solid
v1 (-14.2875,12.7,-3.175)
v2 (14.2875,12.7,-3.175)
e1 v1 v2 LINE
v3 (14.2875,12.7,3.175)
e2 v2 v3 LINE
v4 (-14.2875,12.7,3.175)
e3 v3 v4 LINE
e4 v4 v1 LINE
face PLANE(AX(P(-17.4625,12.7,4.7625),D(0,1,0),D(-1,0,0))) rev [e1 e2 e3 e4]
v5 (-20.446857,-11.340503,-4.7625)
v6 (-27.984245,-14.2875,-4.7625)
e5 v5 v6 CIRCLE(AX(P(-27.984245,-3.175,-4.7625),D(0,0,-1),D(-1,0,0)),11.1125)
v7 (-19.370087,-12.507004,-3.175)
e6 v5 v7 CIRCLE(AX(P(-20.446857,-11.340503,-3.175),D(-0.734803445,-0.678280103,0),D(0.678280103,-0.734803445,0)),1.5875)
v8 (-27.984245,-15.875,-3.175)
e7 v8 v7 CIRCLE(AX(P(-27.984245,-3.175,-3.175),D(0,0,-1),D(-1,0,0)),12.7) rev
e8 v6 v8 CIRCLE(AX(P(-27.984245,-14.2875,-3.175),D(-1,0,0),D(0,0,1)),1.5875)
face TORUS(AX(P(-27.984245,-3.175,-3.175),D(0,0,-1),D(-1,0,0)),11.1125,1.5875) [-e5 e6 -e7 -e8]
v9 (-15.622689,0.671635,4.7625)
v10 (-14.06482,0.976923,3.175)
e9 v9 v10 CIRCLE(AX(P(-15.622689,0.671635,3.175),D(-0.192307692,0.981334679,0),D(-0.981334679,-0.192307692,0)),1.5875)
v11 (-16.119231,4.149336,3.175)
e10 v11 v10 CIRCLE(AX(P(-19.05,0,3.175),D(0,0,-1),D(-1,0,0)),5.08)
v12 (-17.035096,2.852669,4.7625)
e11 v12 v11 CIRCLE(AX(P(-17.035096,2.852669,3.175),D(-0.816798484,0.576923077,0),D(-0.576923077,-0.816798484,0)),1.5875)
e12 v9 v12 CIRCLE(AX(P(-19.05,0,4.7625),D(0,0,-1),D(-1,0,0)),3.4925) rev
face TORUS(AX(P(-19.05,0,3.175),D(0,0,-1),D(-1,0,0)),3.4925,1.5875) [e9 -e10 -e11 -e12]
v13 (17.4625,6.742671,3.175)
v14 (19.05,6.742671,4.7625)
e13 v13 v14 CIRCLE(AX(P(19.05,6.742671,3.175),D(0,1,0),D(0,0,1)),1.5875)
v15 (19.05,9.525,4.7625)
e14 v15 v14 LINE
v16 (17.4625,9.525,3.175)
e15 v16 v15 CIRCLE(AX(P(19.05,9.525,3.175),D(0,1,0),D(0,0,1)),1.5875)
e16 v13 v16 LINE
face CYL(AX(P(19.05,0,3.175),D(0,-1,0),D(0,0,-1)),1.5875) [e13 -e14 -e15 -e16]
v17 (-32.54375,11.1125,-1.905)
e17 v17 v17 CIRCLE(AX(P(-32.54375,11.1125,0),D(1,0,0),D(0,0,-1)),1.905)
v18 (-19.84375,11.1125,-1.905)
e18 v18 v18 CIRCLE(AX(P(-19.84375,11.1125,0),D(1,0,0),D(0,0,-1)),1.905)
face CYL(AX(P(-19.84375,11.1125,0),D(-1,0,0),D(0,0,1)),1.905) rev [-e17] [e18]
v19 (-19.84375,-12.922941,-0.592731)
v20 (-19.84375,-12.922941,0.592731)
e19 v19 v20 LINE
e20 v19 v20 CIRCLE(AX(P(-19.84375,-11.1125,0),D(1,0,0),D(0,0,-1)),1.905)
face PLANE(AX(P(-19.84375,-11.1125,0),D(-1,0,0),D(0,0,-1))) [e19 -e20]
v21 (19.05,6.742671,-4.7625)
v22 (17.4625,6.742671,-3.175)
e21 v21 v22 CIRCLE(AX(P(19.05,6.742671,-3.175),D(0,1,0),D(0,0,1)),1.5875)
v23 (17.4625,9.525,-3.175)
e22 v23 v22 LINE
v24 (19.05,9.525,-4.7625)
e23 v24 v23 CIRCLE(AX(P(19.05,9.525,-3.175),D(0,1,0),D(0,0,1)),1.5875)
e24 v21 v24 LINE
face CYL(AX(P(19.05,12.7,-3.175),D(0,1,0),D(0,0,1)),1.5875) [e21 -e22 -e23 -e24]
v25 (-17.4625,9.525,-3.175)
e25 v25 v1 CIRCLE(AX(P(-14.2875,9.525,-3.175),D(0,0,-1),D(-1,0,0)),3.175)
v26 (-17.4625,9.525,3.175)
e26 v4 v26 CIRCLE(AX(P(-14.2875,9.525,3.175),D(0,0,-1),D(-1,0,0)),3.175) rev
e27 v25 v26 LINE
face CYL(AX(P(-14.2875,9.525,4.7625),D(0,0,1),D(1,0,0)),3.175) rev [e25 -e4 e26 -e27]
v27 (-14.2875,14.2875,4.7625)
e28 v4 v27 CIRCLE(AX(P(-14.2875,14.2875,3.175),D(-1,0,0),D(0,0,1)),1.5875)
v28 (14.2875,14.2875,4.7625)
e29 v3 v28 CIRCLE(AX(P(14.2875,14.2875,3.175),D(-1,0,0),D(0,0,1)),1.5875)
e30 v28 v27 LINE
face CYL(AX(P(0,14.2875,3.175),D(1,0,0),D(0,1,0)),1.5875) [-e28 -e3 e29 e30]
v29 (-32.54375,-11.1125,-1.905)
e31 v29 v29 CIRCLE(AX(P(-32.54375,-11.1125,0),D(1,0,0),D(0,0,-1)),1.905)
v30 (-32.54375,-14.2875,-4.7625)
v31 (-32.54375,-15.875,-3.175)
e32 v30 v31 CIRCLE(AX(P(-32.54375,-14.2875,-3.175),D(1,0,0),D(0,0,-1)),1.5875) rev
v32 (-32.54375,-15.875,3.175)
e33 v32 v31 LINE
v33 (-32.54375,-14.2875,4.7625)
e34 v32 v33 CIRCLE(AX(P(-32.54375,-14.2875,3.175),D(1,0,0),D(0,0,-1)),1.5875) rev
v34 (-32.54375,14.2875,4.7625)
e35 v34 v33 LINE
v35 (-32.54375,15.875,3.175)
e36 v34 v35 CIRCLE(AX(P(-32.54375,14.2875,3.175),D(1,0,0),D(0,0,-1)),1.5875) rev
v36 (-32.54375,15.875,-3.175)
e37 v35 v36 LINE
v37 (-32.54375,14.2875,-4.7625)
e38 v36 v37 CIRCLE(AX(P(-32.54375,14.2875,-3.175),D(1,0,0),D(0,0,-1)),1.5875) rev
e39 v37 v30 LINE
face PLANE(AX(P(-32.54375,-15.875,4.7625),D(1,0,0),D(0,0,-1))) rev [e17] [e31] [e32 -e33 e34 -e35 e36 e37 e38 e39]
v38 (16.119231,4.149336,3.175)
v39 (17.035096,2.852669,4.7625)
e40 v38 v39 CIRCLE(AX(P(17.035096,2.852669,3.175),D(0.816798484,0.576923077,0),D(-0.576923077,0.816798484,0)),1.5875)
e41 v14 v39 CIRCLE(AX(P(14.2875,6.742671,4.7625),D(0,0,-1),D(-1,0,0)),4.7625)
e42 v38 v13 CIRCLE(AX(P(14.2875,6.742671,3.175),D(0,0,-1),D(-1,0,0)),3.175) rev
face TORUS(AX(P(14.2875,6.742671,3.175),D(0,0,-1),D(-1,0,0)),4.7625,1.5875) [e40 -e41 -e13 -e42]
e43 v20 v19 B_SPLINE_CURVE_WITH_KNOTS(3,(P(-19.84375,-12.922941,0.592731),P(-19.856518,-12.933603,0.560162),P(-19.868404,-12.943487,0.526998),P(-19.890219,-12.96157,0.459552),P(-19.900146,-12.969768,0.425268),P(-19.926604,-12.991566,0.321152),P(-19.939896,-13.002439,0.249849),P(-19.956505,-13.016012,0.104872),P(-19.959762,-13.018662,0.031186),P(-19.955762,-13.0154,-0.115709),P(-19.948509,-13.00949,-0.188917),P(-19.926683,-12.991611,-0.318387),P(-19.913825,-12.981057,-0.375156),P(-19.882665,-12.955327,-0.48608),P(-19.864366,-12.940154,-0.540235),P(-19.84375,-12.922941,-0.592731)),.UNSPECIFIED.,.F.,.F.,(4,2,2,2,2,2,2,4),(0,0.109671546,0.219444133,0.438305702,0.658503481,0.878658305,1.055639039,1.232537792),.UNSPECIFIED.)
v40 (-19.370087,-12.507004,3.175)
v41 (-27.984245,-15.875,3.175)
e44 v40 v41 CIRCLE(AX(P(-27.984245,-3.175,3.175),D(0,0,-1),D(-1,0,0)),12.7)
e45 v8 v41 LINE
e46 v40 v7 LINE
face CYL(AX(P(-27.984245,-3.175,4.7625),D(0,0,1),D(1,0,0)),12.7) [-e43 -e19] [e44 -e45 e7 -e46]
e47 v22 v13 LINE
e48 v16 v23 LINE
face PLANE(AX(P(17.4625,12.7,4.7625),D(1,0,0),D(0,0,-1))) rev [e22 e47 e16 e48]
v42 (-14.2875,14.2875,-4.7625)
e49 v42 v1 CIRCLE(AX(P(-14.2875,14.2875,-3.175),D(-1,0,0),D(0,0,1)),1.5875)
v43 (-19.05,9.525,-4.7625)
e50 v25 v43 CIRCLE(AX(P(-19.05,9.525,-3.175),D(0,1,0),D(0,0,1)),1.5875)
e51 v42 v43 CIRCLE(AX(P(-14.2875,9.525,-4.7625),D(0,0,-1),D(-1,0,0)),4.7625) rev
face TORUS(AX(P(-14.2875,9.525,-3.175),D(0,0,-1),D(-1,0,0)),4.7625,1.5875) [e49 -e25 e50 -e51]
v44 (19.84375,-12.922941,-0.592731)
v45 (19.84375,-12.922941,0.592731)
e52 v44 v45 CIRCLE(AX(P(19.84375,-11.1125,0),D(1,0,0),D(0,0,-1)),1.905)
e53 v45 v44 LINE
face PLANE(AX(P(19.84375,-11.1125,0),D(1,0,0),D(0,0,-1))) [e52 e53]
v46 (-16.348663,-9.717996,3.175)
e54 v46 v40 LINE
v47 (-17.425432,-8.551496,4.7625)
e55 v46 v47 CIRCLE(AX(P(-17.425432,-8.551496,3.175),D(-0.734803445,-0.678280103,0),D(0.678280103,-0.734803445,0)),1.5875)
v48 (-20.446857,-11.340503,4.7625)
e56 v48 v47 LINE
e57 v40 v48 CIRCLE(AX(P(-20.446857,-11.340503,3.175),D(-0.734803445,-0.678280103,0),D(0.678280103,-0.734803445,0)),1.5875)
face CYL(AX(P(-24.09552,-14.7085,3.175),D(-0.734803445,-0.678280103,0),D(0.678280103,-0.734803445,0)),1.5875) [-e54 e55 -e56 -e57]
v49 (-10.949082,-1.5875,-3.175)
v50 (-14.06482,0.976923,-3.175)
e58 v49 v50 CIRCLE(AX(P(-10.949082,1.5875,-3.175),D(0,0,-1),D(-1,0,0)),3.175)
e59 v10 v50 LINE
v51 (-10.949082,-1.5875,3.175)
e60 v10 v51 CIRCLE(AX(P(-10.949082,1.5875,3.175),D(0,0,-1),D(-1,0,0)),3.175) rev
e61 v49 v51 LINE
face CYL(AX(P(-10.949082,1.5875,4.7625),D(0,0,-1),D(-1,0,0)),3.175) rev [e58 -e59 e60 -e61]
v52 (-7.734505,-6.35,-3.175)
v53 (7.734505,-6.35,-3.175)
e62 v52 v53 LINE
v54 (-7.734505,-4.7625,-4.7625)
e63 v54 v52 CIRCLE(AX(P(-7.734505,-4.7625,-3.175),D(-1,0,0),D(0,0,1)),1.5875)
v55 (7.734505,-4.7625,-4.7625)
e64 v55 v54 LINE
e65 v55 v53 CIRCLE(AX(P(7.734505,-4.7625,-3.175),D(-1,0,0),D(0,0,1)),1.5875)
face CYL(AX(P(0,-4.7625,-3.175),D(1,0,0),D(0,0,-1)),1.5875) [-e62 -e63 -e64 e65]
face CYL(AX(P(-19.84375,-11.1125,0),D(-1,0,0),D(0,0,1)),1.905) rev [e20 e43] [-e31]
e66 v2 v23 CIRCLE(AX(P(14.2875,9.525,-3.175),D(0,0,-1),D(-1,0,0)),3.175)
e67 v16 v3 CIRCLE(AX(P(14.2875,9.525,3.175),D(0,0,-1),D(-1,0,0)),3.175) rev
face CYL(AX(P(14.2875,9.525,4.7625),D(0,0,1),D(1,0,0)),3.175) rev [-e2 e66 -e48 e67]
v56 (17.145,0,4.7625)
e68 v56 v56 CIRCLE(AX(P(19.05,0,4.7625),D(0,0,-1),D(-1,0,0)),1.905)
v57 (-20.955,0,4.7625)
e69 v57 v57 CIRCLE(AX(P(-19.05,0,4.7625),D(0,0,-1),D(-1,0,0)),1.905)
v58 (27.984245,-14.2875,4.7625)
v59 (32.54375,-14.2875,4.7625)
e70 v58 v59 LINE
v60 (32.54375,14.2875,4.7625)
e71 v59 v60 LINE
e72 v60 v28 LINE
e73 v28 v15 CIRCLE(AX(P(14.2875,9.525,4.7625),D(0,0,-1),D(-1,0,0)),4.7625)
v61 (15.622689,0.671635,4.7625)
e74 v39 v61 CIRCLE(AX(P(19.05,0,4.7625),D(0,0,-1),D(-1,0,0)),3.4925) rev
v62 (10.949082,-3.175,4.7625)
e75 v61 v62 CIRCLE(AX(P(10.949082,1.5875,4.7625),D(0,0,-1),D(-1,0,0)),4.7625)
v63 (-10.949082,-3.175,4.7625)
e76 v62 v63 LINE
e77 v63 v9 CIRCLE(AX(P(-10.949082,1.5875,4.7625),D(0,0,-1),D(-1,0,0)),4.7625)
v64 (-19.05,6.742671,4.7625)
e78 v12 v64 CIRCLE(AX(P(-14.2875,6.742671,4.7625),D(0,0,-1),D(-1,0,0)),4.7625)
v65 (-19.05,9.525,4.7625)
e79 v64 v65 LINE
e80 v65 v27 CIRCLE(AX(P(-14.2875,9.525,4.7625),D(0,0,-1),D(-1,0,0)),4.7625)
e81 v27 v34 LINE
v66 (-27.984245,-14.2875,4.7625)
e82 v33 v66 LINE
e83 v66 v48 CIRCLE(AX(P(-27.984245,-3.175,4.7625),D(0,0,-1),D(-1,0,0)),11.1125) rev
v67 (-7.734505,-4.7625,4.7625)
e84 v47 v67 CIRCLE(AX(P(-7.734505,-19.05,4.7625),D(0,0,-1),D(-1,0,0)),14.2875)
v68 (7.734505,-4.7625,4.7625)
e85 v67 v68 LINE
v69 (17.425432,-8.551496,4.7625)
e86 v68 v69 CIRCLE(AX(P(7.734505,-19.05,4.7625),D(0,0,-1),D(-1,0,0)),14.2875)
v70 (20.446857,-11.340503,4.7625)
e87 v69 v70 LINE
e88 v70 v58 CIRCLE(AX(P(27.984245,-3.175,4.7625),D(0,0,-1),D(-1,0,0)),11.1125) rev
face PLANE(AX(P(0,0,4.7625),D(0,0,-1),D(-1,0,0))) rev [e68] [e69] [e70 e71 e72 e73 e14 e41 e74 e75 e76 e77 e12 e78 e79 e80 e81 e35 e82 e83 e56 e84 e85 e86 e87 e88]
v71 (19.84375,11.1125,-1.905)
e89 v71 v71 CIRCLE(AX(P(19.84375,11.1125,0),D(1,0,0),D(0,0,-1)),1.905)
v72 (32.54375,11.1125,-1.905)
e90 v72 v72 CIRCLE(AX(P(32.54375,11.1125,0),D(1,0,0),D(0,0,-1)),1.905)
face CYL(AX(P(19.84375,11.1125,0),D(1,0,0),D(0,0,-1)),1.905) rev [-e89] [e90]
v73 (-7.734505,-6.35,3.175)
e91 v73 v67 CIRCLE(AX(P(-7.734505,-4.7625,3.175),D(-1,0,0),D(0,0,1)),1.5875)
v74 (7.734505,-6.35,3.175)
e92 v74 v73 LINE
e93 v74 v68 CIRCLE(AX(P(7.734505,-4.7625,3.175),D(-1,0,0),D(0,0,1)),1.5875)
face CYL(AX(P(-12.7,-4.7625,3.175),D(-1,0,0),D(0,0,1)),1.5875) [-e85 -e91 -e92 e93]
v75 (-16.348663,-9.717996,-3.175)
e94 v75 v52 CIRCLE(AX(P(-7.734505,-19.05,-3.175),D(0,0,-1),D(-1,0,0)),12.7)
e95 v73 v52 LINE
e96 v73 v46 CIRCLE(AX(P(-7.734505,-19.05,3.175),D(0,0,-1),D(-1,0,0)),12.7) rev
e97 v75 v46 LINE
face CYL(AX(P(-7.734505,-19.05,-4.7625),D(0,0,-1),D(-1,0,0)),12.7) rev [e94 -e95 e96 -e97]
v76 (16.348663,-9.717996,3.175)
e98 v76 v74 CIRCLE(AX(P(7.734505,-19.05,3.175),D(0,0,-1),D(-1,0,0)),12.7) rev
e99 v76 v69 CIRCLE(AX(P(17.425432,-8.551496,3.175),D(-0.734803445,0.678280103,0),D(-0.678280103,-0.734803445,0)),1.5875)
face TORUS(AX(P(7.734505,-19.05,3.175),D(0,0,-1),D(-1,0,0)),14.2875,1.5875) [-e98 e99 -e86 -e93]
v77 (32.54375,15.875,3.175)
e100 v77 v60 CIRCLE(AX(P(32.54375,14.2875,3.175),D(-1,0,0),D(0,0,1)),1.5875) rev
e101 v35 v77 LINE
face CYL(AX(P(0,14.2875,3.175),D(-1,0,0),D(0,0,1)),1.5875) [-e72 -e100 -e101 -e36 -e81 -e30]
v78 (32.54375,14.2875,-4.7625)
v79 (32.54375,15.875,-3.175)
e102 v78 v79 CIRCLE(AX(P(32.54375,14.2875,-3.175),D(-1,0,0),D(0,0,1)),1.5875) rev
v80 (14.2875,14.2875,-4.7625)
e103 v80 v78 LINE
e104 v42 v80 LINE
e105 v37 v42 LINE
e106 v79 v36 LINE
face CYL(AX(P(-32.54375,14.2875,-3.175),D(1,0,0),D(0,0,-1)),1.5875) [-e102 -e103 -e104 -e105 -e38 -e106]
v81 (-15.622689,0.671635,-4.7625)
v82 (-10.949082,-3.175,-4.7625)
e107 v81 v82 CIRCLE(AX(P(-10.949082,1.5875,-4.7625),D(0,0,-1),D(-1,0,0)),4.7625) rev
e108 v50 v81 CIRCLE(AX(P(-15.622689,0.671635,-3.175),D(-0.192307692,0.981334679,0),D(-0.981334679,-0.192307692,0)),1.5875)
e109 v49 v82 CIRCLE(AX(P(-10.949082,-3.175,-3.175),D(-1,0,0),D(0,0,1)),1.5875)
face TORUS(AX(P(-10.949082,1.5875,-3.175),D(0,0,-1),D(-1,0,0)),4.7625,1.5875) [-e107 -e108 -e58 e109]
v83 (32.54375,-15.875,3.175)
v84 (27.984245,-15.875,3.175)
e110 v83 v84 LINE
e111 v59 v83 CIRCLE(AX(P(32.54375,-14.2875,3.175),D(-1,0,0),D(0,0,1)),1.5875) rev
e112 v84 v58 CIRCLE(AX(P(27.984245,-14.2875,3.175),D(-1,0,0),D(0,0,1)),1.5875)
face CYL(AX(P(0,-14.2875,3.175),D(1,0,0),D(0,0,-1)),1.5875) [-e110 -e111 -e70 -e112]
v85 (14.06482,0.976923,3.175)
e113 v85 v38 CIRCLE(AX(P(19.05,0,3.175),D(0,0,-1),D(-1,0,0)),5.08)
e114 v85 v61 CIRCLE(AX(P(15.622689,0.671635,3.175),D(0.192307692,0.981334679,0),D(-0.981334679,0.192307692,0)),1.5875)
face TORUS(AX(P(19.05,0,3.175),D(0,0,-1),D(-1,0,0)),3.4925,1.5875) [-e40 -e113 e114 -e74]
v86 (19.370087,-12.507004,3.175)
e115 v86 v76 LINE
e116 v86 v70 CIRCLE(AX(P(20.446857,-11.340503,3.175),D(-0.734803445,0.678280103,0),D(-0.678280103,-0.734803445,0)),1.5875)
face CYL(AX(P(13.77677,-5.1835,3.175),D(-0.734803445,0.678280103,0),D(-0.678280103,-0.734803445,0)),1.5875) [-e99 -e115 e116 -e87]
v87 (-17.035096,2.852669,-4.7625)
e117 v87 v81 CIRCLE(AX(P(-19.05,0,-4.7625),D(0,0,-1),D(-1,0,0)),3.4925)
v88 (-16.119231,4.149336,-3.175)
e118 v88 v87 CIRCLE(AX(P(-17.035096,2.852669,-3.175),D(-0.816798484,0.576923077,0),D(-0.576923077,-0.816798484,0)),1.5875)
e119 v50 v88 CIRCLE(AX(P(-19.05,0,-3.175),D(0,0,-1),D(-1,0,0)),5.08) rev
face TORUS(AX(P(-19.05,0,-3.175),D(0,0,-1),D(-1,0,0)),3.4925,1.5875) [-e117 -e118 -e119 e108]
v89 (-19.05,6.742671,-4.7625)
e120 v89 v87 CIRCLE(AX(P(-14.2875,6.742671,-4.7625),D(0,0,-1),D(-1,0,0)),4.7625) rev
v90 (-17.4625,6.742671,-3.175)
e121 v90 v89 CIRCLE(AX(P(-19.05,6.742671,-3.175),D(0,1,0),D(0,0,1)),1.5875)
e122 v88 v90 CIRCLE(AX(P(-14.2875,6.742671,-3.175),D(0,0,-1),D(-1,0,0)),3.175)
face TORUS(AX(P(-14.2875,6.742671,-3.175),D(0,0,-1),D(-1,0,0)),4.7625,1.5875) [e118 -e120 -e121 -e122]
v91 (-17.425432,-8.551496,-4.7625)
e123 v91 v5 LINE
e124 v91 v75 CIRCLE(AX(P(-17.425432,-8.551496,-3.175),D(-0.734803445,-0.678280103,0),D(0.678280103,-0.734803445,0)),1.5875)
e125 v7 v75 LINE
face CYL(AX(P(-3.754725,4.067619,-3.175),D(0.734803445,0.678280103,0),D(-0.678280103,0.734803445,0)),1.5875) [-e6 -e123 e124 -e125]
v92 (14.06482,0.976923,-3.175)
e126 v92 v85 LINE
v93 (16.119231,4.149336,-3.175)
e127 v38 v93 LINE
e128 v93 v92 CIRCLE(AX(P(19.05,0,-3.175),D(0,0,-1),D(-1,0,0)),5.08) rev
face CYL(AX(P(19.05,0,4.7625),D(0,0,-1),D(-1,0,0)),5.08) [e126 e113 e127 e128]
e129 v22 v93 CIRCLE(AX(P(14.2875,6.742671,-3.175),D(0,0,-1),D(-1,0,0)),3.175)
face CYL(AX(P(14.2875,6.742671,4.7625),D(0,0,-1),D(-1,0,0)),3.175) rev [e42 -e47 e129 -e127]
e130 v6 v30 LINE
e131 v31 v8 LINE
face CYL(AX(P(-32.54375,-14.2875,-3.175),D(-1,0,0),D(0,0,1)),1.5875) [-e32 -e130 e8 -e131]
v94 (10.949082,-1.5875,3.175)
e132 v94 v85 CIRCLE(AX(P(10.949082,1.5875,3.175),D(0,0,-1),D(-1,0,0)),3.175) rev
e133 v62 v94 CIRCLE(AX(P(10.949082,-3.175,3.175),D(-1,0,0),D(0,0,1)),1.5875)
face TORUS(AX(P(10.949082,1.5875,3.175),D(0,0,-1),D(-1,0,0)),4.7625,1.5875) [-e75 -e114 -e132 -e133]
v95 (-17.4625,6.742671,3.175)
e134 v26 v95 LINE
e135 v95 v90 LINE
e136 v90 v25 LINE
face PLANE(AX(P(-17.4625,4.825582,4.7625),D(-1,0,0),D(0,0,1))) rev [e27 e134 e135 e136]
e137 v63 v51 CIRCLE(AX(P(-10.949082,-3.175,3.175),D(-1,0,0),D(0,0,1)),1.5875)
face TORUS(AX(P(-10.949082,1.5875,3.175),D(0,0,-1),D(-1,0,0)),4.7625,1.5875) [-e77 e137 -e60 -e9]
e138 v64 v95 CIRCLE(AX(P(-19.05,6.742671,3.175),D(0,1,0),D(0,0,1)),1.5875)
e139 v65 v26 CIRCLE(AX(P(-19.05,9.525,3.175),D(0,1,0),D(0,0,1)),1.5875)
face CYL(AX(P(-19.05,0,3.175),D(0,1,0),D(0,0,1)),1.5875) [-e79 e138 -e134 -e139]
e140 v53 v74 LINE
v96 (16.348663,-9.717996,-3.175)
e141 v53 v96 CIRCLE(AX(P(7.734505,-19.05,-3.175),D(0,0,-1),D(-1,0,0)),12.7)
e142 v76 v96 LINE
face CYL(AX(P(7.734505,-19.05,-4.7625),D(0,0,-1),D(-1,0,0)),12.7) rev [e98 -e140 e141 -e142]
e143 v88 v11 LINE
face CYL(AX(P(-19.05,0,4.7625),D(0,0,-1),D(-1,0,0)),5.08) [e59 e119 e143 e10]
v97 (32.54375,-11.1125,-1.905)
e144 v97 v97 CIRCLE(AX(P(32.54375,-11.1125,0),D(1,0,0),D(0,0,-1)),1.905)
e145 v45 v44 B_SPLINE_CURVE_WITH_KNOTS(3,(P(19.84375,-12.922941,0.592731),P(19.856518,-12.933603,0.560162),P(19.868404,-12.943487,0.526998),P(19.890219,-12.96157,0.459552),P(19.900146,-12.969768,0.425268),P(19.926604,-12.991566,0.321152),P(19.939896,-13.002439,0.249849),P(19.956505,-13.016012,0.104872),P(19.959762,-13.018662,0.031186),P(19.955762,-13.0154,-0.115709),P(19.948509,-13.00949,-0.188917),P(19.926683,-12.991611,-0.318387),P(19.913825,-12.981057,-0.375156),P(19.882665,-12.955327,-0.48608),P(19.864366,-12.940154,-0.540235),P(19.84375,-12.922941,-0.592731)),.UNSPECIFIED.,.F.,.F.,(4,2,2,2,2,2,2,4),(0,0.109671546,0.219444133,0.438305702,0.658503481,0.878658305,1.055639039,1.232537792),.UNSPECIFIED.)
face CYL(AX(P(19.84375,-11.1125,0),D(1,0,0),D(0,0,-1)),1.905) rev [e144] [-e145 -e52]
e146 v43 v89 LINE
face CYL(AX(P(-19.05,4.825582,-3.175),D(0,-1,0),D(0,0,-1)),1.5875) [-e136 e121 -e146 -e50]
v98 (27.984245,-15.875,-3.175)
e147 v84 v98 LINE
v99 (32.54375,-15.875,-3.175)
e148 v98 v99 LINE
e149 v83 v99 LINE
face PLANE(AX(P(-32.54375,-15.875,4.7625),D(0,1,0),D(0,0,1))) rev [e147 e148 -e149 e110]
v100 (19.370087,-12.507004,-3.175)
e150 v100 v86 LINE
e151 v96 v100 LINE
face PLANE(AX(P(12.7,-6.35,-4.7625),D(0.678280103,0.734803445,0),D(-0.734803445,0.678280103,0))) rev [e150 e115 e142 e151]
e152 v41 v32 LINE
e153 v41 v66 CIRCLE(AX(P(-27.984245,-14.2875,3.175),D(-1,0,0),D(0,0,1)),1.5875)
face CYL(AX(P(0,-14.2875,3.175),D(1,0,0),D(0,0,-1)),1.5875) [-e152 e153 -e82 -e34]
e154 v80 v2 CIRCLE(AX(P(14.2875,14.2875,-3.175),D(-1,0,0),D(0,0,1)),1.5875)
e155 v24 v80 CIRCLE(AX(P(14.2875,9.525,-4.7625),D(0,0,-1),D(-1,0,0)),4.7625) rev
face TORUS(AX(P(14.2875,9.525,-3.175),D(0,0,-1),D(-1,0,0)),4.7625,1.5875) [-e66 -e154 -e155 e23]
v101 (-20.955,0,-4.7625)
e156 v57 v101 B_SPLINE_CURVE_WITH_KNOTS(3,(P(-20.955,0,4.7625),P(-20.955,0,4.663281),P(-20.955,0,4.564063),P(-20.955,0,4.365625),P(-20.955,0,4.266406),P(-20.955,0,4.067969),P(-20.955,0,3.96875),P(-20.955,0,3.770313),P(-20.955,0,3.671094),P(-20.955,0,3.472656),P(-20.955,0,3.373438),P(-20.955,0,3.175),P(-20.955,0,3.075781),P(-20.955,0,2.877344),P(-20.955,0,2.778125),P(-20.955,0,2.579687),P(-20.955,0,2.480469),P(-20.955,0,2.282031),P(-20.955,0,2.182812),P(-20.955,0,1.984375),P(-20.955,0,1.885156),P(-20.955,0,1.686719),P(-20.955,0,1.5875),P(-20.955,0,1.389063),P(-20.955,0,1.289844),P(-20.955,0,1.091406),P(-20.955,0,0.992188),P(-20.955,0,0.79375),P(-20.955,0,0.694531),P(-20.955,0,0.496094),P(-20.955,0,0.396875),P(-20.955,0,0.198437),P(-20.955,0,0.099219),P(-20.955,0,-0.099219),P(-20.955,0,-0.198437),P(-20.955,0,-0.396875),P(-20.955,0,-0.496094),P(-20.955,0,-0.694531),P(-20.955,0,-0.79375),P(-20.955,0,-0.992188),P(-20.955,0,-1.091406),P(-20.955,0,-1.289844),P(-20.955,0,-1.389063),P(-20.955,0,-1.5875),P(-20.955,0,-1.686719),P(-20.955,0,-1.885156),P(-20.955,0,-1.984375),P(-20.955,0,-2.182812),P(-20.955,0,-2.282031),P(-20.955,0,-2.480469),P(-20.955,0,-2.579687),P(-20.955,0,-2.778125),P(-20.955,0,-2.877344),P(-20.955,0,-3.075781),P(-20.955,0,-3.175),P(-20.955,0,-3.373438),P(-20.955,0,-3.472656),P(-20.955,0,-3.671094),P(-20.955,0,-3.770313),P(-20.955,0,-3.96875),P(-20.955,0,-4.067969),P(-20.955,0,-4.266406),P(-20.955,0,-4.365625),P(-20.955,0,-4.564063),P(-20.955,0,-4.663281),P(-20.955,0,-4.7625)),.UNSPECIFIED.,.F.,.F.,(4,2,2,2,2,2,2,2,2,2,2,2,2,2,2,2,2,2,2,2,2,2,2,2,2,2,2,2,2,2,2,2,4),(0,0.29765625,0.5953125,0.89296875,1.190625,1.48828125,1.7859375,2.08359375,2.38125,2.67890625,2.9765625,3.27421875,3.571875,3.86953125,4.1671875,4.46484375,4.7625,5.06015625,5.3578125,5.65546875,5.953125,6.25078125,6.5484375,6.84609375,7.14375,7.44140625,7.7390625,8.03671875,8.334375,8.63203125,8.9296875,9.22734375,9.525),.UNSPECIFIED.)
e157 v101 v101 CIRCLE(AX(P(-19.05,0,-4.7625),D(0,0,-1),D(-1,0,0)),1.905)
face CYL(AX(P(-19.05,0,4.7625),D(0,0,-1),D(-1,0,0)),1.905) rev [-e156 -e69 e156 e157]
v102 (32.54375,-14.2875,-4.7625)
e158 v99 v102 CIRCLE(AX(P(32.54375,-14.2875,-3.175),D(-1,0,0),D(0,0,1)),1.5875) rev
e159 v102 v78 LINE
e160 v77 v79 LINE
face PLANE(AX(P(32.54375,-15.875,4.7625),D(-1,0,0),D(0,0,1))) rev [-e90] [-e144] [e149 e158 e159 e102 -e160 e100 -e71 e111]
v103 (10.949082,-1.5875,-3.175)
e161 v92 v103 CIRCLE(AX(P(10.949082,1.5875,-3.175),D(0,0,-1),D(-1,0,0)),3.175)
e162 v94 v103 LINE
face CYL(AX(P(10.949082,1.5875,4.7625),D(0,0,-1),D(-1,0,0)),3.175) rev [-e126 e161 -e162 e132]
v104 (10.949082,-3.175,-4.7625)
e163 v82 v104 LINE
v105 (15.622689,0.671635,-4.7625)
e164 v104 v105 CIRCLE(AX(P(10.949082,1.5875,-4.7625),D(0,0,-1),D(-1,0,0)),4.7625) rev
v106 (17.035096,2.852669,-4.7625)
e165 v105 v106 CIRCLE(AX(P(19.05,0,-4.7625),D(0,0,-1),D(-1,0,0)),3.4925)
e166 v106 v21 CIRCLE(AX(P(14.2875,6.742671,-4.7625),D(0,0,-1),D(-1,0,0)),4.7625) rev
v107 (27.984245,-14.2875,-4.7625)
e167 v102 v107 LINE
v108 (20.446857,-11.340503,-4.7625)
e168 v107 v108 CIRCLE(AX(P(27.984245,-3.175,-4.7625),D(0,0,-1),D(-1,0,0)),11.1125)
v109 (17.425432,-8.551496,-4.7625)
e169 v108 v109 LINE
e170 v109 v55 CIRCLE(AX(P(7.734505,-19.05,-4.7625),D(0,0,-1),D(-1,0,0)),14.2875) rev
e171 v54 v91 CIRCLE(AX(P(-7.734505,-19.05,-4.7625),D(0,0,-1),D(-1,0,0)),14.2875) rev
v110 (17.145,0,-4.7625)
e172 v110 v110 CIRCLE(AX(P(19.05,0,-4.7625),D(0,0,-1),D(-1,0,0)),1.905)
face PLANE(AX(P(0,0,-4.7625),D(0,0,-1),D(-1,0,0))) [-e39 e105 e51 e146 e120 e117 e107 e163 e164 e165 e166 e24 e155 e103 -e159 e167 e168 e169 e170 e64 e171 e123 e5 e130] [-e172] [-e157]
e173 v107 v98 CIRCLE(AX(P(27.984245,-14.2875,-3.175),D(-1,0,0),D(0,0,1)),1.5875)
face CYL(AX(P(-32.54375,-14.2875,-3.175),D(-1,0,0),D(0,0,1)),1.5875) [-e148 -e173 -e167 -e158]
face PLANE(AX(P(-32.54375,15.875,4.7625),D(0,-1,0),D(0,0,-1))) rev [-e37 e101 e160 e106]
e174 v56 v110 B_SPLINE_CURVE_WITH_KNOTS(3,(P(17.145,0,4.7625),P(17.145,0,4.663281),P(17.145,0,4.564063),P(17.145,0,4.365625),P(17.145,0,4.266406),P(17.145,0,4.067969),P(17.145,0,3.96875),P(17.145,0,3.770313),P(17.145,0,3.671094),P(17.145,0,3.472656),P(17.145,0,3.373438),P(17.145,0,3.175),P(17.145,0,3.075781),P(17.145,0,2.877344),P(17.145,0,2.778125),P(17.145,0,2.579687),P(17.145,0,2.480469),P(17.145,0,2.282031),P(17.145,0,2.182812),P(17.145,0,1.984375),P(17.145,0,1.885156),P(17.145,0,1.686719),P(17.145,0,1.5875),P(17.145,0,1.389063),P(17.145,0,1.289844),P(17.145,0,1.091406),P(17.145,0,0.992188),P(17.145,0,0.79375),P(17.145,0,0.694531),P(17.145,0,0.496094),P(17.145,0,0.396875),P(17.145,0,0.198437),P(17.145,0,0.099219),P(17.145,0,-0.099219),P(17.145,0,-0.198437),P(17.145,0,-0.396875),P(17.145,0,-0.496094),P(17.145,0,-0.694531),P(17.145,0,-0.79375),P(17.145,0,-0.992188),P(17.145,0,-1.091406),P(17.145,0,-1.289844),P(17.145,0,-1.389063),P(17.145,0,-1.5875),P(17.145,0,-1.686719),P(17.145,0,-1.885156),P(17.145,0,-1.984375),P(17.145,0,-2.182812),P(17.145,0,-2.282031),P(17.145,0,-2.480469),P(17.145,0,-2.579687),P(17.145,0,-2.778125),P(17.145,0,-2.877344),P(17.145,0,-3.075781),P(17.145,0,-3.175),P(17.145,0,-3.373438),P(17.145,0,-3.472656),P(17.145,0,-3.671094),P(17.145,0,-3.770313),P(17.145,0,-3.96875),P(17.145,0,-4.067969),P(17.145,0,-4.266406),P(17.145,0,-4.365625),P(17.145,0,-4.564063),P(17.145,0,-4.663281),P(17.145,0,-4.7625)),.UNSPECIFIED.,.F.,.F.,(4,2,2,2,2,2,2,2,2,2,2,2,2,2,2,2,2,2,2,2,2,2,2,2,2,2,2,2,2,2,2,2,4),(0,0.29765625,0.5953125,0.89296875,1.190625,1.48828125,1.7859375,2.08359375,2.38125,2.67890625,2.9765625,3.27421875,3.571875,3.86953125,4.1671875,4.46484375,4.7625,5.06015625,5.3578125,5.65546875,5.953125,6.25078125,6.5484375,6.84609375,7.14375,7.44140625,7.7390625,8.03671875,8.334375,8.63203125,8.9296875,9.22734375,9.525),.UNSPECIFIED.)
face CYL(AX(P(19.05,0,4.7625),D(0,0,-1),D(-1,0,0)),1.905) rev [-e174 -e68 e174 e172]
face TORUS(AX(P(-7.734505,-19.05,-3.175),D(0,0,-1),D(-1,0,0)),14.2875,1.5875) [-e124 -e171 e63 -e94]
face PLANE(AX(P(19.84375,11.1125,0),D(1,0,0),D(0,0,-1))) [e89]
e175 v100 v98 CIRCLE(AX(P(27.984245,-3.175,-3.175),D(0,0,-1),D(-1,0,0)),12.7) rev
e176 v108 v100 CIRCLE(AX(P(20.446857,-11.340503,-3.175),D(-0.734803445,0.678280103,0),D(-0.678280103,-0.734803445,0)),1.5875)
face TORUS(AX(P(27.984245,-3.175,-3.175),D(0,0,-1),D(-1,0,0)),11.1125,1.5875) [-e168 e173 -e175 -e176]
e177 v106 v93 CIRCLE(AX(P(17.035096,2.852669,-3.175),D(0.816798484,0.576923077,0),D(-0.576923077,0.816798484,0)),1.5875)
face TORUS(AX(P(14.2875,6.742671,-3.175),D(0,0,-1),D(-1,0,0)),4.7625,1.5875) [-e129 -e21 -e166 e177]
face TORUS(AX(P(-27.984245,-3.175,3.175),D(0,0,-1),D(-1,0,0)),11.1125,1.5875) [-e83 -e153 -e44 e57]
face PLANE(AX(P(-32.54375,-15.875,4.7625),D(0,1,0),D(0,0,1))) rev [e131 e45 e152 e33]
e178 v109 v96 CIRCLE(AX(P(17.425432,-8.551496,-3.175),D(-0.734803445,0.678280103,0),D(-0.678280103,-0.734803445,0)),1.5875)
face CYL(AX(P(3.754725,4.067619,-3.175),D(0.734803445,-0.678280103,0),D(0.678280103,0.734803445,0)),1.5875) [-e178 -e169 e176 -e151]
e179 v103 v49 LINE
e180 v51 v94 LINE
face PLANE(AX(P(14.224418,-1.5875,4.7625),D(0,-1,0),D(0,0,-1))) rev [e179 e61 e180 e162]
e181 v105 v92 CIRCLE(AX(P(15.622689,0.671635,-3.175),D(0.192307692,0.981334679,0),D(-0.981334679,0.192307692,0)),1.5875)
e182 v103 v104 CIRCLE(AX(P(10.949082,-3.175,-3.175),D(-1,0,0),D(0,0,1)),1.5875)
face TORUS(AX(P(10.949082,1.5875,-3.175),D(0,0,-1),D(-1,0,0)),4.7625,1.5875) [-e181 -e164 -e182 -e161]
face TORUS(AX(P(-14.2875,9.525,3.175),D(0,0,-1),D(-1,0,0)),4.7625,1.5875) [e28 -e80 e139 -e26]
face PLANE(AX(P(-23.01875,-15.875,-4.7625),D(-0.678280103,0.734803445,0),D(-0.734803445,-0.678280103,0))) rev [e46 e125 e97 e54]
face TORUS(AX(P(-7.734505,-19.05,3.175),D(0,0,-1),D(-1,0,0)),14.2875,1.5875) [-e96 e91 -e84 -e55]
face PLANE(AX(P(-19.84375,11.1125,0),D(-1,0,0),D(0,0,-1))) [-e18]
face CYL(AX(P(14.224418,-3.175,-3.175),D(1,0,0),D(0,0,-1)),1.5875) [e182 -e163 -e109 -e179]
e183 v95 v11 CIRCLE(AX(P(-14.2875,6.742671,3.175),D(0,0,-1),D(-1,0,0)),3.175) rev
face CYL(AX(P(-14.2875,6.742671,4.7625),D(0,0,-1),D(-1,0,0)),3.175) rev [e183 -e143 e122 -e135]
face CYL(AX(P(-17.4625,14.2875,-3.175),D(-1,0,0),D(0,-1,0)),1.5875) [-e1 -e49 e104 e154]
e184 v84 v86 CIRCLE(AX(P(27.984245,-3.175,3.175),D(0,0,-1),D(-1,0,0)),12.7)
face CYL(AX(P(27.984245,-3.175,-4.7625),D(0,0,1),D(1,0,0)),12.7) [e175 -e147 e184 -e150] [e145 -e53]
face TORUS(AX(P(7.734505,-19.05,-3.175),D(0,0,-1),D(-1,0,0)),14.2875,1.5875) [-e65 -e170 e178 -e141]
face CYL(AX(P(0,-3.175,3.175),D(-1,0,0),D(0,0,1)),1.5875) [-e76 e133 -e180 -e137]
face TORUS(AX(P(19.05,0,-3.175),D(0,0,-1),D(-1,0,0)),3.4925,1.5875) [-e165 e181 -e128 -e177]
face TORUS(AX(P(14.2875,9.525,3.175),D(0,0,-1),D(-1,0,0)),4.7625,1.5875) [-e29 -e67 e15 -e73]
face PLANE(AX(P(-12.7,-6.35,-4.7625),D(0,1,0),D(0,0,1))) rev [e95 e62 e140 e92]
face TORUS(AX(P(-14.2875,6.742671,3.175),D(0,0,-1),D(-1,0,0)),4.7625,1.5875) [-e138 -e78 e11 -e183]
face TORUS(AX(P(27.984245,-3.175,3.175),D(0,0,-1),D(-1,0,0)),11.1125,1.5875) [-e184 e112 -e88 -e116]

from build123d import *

# Parameters (mm, degrees)
SKETCH1_W           = 65.0875
SKETCH1_H           = 31.75
BOSS_EXTRUDE1_DEPTH = 4.7625
CUT_EXTRUDE1_DEPTH  = 38.441112618
SKETCH3_R           = 1.905
CUT_EXTRUDE2_DEPTH  = 12.7
SKETCH4_R           = 1.905
CUT_EXTRUDE3_DEPTH  = 38.441112618
CUT_EXTRUDE4_DEPTH  = 38.441112618
FILLET3_R           = 3.175
FILLET6_R           = 12.7
FILLET5_R           = 1.5875


# Some blends are built 0.0001 mm under size
with BuildPart() as part:
    # Sketch1 → Boss-Extrude1 (new, symmetric)
    with BuildSketch(Plane.XY):
        Rectangle(SKETCH1_W, SKETCH1_H)
    extrude(amount=BOSS_EXTRUDE1_DEPTH, both=True)

    # Sketch2 → Cut-Extrude1 (cut, through all)
    with BuildSketch(Plane.XY.offset(4.7625)):
        Polygon((-23.01875, -15.875), (-12.7, -6.35), (12.7, -6.35), (23.01875, -15.875), align=None)
    extrude(amount=-CUT_EXTRUDE1_DEPTH, mode=Mode.SUBTRACT)

    # Sketch3 → Cut-Extrude2 (cut)
    with BuildSketch(Plane(origin=(32.54375, 0, 0), x_dir=(0, 0, -1), z_dir=(1, 0, 0))):
        with Locations((0, 11.1125)):
            Circle(SKETCH3_R)
        with Locations((0, -11.1125)):
            Circle(SKETCH3_R)
    cut_extrude2 = extrude(amount=-CUT_EXTRUDE2_DEPTH, mode=Mode.SUBTRACT)

    # Mirror2: Cut-Extrude2 across plane
    add(cut_extrude2.mirror(Plane(origin=(0, 0, 0), x_dir=(0, 0, 1), z_dir=(1, 0, 0))), mode=Mode.SUBTRACT)

    # Sketch4 → Cut-Extrude3 (cut, through all)
    with BuildSketch(Plane(origin=(0, 0, -4.7625), x_dir=(-1, 0, 0), z_dir=(0, 0, -1))):
        with Locations((-19.05, 0)):
            Circle(SKETCH4_R)
        with Locations((19.05, 0)):
            Circle(SKETCH4_R)
    extrude(amount=-CUT_EXTRUDE3_DEPTH, mode=Mode.SUBTRACT)

    # Sketch5 → Cut-Extrude4 (cut, through all)
    with BuildSketch(Plane(origin=(0, 0, -4.7625), x_dir=(-1, 0, 0), z_dir=(0, 0, -1))):
        with BuildLine():
            Line((-14.224417781, -1.5875), (14.224417781, -1.5875))
            ThreePointArc((14.224417781, -1.5875), (14.515266075, 2.289669895), (17.4625, 4.825582219))
            Line((17.4625, 4.825582219), (17.4625, 12.7))
            Line((17.4625, 12.7), (-17.4625, 12.7))
            Line((-17.4625, 12.7), (-17.4625, 4.825582219))
            ThreePointArc((-17.4625, 4.825582219), (-14.515266075, 2.289669895), (-14.224417781, -1.5875))
        make_face()
    extrude(amount=-CUT_EXTRUDE4_DEPTH, mode=Mode.SUBTRACT)

    # Fillet3
    fillet3_edges = [part.edges().sort_by_distance(p)[0] for p in [
        (-17.4625, 4.825582219, 0),
        (-14.224417781, -1.5875, 0),
        (14.224417781, -1.5875, 0),
        (17.4625, 4.825582219, 0),
        (17.4625, 12.7, 0),
        (-17.4625, 12.7, 0),
    ]]
    fillet(fillet3_edges, radius=FILLET3_R)

    # Fillet6
    # the kernel refuses this fillet: 12.7 mm, written as the material it adds along each edge
    with BuildSketch(Plane(origin=(-12.7, -6.35, 4.7625), x_dir=(-0.7348034446274875, -0.6782801027330664, 0), z_dir=(0, 0, -1)), Plane(origin=(12.7, -6.35, 4.7625), x_dir=(-1, 0, 0), z_dir=(0, 0, -1))) as fillet6_piece_1:
        with BuildLine():
            CenterArc((FILLET6_R * 0.390983834413, -FILLET6_R), FILLET6_R, 90, 42.709389957)
            Line((-FILLET6_R * 0.28729626832, -FILLET6_R * 0.265196555373), (0, 0))
            Line((0, 0), (FILLET6_R * 0.390983834413, 0))
        make_face()
    extrude(amount=9.525)
    # the kernel refuses this fillet: 12.7 mm, written as the material it takes off along each edge
    with BuildSketch(Plane(origin=(23.01875, -15.875, 17.176236743), x_dir=(1, 0, 0), z_dir=(0, 0, -1))) as fillet6_2_piece_1:
        with BuildLine():
            CenterArc((FILLET6_R * 0.390983834413, -FILLET6_R), FILLET6_R, 90, 42.709389957)
            Line((-FILLET6_R * 0.28729626832, -FILLET6_R * 0.265196555373), (0, 0))
            Line((0, 0), (FILLET6_R * 0.390983834413, 0))
        make_face()
    extrude(amount=34.352473485, mode=Mode.SUBTRACT)
    with BuildSketch(Plane(origin=(-23.01875, -15.875, 17.176236743), x_dir=(-1, 0, 0), z_dir=(0, 0, -1))) as fillet6_2_piece_2:
        with BuildLine():
            CenterArc((FILLET6_R * 0.390983834413, FILLET6_R), FILLET6_R, 227.290610043, 42.709389957)
            Line((-FILLET6_R * 0.28729626832, FILLET6_R * 0.265196555373), (0, 0))
            Line((0, 0), (FILLET6_R * 0.390983834413, 0))
        make_face()
    extrude(amount=34.352473485, mode=Mode.SUBTRACT)

    # Fillet5
    fillet5_edges = [part.edges().sort_by_distance(p)[0] for p in [
        (0, -1.5875, 4.7625),
        (-16.53256403, 11.77006403, -4.7625),
        (-16.53256403, 11.77006403, 4.7625),
        (-17.106752578, 5.282383875, -4.7625),
        (-17.106752578, 5.282383875, 4.7625),
        (17.106752578, 5.282383875, -4.7625),
        (17.106752578, 5.282383875, 4.7625),
        (16.53256403, 11.77006403, -4.7625),
        (16.53256403, 11.77006403, 4.7625),
        (12.966759515, -0.863949238, -4.7625),
        (12.966759515, -0.863949238, 4.7625),
        (-12.966759515, -0.863949238, -4.7625),
        (-12.966759515, -0.863949238, 4.7625),
        (-17.859375, -11.1125, 4.7625),
        (0, -6.35, 4.7625),
        (17.859375, -11.1125, 4.7625),
        (30.263997349, -15.875, 4.7625),
        (23.359660801, -15.003069318, 4.7625),
        (-23.359660801, -15.003069318, 4.7625),
        (-17.859375, -11.1125, -4.7625),
        (30.263997349, -15.875, -4.7625),
        (17.859375, -11.1125, -4.7625),
        (0, -6.35, -4.7625),
        (23.359660801, -15.003069318, -4.7625),
        (-23.359660801, -15.003069318, -4.7625),
        (-12.359089199, -7.221930682, 4.7625),
        (-12.359089199, -7.221930682, -4.7625),
        (12.359089199, -7.221930682, 4.7625),
        (12.359089199, -7.221930682, -4.7625),
        (-30.263997349, -15.875, 4.7625),
        (-30.263997349, -15.875, -4.7625),
        (0, 15.875, -4.7625),
        (0, 12.7, -4.7625),
        (0, 12.7, 4.7625),
        (0, 15.875, 4.7625),
        (-17.4625, 8.133835742, -4.7625),
        (-17.4625, 8.133835742, 4.7625),
        (-14.786009483, 2.7613013, -4.7625),
        (-14.786009483, 2.7613013, 4.7625),
        (14.786009483, 2.7613013, -4.7625),
        (14.786009483, 2.7613013, 4.7625),
        (17.4625, 8.133835742, -4.7625),
        (17.4625, 8.133835742, 4.7625),
        (0, -1.5875, -4.7625),
    ]]
    fillet(fillet5_edges, radius=FILLET5_R - 0.0001)  # a hair under: the kernel refuses the full size


solid = part.part
